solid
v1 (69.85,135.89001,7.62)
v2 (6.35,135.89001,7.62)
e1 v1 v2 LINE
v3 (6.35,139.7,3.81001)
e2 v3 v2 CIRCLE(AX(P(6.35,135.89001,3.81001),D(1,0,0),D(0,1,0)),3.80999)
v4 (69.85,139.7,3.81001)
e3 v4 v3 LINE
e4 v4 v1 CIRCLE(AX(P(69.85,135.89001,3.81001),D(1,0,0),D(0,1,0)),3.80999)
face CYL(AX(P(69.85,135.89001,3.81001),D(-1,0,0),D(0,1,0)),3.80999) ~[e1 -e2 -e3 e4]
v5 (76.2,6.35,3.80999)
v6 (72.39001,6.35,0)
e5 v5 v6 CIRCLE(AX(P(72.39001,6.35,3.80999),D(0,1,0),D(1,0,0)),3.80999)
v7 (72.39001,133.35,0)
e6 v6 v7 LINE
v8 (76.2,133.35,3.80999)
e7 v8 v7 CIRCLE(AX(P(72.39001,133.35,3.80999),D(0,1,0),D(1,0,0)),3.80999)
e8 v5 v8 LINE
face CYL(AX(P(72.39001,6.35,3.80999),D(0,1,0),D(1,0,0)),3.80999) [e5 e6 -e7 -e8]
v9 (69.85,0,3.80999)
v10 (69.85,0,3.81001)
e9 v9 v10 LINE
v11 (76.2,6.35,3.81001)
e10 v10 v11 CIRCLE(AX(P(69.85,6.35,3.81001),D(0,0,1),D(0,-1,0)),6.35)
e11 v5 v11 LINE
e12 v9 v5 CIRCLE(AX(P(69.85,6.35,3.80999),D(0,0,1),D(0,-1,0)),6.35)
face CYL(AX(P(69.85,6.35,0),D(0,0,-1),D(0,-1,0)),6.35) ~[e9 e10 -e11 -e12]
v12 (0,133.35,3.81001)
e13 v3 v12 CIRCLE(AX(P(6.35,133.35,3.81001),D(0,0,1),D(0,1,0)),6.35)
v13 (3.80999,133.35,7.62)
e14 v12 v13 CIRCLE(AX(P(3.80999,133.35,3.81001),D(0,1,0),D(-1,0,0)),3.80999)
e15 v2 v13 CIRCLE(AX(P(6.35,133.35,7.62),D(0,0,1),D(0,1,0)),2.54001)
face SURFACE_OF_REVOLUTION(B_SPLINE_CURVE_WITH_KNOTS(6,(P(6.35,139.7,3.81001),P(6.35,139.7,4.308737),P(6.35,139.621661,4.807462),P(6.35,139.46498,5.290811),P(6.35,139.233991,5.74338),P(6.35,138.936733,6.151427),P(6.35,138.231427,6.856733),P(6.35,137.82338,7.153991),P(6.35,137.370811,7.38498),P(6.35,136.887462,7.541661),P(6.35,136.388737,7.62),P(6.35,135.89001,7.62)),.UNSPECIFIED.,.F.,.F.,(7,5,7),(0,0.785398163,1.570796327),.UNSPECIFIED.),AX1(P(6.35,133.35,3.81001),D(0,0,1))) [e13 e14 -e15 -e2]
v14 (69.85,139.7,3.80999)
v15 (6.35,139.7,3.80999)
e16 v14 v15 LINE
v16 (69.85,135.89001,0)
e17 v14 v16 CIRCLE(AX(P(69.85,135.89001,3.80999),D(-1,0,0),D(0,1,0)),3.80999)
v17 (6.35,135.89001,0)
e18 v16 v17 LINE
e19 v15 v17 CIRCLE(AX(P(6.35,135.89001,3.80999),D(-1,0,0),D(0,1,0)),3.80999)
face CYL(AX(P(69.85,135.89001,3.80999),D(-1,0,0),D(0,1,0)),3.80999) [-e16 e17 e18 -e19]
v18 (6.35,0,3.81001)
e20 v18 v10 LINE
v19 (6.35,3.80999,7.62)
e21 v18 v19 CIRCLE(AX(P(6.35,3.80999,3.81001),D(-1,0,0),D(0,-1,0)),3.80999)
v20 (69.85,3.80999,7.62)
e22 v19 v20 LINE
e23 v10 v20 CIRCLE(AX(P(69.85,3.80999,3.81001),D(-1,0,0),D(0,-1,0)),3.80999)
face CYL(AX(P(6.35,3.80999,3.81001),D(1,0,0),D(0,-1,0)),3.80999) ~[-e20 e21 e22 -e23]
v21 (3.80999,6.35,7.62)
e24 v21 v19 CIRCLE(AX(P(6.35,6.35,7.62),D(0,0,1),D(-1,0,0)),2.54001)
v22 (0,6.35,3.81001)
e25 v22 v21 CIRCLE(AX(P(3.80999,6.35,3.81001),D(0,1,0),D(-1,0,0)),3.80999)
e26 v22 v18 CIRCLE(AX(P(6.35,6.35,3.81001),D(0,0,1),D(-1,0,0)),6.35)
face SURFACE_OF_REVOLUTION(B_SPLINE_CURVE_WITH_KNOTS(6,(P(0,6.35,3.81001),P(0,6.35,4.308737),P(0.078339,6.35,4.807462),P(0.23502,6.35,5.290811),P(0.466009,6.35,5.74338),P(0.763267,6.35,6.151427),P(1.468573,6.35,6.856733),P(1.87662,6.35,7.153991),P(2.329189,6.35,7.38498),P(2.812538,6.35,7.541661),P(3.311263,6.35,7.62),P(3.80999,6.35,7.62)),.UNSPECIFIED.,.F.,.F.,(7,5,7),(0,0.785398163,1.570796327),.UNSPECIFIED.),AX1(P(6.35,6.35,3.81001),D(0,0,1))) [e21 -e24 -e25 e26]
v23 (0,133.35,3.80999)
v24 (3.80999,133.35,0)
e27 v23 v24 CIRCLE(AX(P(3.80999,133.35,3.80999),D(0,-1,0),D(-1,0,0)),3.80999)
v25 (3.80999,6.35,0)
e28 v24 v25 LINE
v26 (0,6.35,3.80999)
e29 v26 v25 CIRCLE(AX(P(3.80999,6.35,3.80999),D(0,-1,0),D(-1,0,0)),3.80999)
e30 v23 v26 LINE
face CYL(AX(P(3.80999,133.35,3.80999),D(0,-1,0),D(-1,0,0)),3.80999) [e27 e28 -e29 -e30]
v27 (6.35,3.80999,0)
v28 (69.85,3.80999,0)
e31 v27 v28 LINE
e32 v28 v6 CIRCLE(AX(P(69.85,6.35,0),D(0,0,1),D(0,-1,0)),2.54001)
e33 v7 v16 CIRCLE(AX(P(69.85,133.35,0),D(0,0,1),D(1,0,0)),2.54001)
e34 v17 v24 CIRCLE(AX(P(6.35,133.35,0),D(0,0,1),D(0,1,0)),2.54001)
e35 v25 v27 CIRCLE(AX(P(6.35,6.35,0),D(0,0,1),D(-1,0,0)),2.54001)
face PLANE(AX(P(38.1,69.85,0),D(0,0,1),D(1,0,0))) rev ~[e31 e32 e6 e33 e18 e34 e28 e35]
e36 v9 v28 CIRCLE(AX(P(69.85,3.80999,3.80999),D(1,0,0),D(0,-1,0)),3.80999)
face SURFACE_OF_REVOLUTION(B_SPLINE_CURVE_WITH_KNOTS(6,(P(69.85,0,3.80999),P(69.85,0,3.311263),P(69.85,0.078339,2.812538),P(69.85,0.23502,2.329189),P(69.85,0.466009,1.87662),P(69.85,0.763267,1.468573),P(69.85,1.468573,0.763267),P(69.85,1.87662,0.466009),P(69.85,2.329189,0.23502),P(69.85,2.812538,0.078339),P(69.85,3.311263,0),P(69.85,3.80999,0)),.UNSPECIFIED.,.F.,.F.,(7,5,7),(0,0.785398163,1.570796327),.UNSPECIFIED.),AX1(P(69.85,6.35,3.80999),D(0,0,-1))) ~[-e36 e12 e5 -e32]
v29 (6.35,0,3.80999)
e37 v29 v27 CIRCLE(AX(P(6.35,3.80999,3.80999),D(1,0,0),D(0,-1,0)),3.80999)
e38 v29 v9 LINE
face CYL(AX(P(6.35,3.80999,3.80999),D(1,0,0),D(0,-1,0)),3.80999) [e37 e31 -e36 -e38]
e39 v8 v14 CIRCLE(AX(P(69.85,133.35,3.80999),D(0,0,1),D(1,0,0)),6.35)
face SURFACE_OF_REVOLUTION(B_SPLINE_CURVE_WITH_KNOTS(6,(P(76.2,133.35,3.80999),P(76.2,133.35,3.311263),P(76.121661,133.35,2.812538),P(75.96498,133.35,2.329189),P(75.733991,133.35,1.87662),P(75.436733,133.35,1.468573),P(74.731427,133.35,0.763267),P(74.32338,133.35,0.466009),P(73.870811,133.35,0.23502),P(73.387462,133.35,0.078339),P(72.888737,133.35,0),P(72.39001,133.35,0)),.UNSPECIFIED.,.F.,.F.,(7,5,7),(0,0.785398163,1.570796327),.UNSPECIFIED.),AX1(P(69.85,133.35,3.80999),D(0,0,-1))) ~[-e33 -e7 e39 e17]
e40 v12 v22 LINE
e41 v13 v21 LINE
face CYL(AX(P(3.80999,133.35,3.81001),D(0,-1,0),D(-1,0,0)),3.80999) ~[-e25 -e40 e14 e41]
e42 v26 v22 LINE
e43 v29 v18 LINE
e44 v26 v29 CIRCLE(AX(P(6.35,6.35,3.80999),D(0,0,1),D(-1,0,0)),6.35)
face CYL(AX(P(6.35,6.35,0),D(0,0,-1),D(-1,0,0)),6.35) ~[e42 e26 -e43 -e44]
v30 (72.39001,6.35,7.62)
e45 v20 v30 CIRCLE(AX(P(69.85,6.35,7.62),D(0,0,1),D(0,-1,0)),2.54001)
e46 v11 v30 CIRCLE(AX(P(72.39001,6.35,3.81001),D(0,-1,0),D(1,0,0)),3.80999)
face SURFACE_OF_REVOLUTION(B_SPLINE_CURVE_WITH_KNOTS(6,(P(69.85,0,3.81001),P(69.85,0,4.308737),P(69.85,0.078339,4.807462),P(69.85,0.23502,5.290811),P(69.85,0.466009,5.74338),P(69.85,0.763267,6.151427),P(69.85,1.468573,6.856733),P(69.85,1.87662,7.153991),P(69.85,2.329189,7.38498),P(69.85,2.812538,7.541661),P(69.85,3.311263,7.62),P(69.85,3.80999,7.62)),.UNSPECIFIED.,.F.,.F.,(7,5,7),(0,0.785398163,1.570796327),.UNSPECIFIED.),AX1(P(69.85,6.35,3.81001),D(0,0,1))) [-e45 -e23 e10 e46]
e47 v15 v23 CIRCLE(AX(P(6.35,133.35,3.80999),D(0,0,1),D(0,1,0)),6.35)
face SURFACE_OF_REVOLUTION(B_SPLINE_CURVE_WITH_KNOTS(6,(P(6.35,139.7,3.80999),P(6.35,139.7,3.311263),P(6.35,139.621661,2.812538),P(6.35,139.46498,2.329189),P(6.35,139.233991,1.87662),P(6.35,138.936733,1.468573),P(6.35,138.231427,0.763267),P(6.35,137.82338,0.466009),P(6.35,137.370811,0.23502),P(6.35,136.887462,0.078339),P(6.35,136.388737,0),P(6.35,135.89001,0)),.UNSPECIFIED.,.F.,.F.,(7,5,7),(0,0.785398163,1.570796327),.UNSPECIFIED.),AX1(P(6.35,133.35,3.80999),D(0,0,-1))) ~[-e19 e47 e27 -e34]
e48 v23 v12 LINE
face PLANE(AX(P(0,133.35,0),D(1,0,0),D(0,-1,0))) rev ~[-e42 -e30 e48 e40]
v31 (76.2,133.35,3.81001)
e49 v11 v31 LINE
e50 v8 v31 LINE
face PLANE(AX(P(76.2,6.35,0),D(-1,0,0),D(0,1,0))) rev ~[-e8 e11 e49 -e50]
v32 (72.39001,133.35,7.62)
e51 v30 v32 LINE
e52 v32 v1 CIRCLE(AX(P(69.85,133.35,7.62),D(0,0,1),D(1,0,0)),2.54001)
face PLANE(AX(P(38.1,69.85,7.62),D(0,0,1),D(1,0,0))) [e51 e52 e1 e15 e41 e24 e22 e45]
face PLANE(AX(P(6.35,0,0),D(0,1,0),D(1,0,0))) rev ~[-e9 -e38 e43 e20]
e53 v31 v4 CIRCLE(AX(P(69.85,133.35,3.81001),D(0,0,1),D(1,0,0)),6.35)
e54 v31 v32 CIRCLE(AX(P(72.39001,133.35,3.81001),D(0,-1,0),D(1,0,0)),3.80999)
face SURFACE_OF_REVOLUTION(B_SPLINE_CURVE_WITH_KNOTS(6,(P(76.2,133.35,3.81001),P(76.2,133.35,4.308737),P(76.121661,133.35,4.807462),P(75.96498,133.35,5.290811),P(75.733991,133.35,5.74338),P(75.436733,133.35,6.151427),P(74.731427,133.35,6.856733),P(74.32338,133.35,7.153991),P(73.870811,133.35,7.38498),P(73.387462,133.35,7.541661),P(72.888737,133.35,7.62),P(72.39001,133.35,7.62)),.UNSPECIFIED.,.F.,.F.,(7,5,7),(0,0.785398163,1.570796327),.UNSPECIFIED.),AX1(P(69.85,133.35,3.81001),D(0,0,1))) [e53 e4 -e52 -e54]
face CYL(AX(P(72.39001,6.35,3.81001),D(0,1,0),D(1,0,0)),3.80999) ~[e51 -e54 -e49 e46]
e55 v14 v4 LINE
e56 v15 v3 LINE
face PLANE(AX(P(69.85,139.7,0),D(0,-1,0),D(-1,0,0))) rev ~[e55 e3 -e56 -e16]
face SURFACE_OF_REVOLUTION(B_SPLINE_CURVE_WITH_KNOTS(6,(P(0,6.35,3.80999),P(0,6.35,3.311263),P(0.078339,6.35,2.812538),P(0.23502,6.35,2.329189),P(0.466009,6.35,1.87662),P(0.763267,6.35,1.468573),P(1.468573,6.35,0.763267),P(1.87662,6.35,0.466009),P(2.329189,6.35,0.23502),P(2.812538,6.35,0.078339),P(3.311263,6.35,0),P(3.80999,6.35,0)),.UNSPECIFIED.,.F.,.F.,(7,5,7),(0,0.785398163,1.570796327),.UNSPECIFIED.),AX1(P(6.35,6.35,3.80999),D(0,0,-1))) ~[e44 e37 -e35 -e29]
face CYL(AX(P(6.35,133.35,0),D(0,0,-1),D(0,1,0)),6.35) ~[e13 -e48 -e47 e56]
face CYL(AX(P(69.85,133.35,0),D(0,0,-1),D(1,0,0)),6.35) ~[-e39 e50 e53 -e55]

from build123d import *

# Parameters (mm, degrees)
F1_DEPTH = 7.62
F2_R     = 3.80999


# Not quite as in the source:
# - a fillet or chamfer is up to 0.001 mm smaller than in the source, because OpenCascade refuses the exact size


with BuildPart() as f1:
    # F0 (on Top) → F1 (new body)
    with BuildSketch(Plane.XY):
        with BuildLine():
            ThreePointArc((0, 6.35), (1.8598719395, 1.8598719395), (6.35, 0))
            Line((6.35, 0), (69.85, 0))
            ThreePointArc((69.85, 0), (74.3401280605, 1.8598719395), (76.2, 6.35))
            Line((76.2, 6.35), (76.2, 133.35))
            ThreePointArc((76.2, 133.35), (74.3401280605, 137.8401280605), (69.85, 139.7))
            Line((69.85, 139.7), (6.35, 139.7))
            ThreePointArc((6.35, 139.7), (1.8598719395, 137.8401280605), (0, 133.35))
            Line((0, 133.35), (0, 6.35))
        make_face()
    extrude(amount=F1_DEPTH)

    # F2 (radius 3.81 in the source; OpenCascade refuses exactly that, so slightly less here)
    f2_edges = [f1.edges().sort_by_distance(p)[0] for p in [
        (0, 69.85, 7.62),
        (0, 69.85, 0),
    ]]
    fillet(f2_edges, radius=F2_R)


solid = f1.part
